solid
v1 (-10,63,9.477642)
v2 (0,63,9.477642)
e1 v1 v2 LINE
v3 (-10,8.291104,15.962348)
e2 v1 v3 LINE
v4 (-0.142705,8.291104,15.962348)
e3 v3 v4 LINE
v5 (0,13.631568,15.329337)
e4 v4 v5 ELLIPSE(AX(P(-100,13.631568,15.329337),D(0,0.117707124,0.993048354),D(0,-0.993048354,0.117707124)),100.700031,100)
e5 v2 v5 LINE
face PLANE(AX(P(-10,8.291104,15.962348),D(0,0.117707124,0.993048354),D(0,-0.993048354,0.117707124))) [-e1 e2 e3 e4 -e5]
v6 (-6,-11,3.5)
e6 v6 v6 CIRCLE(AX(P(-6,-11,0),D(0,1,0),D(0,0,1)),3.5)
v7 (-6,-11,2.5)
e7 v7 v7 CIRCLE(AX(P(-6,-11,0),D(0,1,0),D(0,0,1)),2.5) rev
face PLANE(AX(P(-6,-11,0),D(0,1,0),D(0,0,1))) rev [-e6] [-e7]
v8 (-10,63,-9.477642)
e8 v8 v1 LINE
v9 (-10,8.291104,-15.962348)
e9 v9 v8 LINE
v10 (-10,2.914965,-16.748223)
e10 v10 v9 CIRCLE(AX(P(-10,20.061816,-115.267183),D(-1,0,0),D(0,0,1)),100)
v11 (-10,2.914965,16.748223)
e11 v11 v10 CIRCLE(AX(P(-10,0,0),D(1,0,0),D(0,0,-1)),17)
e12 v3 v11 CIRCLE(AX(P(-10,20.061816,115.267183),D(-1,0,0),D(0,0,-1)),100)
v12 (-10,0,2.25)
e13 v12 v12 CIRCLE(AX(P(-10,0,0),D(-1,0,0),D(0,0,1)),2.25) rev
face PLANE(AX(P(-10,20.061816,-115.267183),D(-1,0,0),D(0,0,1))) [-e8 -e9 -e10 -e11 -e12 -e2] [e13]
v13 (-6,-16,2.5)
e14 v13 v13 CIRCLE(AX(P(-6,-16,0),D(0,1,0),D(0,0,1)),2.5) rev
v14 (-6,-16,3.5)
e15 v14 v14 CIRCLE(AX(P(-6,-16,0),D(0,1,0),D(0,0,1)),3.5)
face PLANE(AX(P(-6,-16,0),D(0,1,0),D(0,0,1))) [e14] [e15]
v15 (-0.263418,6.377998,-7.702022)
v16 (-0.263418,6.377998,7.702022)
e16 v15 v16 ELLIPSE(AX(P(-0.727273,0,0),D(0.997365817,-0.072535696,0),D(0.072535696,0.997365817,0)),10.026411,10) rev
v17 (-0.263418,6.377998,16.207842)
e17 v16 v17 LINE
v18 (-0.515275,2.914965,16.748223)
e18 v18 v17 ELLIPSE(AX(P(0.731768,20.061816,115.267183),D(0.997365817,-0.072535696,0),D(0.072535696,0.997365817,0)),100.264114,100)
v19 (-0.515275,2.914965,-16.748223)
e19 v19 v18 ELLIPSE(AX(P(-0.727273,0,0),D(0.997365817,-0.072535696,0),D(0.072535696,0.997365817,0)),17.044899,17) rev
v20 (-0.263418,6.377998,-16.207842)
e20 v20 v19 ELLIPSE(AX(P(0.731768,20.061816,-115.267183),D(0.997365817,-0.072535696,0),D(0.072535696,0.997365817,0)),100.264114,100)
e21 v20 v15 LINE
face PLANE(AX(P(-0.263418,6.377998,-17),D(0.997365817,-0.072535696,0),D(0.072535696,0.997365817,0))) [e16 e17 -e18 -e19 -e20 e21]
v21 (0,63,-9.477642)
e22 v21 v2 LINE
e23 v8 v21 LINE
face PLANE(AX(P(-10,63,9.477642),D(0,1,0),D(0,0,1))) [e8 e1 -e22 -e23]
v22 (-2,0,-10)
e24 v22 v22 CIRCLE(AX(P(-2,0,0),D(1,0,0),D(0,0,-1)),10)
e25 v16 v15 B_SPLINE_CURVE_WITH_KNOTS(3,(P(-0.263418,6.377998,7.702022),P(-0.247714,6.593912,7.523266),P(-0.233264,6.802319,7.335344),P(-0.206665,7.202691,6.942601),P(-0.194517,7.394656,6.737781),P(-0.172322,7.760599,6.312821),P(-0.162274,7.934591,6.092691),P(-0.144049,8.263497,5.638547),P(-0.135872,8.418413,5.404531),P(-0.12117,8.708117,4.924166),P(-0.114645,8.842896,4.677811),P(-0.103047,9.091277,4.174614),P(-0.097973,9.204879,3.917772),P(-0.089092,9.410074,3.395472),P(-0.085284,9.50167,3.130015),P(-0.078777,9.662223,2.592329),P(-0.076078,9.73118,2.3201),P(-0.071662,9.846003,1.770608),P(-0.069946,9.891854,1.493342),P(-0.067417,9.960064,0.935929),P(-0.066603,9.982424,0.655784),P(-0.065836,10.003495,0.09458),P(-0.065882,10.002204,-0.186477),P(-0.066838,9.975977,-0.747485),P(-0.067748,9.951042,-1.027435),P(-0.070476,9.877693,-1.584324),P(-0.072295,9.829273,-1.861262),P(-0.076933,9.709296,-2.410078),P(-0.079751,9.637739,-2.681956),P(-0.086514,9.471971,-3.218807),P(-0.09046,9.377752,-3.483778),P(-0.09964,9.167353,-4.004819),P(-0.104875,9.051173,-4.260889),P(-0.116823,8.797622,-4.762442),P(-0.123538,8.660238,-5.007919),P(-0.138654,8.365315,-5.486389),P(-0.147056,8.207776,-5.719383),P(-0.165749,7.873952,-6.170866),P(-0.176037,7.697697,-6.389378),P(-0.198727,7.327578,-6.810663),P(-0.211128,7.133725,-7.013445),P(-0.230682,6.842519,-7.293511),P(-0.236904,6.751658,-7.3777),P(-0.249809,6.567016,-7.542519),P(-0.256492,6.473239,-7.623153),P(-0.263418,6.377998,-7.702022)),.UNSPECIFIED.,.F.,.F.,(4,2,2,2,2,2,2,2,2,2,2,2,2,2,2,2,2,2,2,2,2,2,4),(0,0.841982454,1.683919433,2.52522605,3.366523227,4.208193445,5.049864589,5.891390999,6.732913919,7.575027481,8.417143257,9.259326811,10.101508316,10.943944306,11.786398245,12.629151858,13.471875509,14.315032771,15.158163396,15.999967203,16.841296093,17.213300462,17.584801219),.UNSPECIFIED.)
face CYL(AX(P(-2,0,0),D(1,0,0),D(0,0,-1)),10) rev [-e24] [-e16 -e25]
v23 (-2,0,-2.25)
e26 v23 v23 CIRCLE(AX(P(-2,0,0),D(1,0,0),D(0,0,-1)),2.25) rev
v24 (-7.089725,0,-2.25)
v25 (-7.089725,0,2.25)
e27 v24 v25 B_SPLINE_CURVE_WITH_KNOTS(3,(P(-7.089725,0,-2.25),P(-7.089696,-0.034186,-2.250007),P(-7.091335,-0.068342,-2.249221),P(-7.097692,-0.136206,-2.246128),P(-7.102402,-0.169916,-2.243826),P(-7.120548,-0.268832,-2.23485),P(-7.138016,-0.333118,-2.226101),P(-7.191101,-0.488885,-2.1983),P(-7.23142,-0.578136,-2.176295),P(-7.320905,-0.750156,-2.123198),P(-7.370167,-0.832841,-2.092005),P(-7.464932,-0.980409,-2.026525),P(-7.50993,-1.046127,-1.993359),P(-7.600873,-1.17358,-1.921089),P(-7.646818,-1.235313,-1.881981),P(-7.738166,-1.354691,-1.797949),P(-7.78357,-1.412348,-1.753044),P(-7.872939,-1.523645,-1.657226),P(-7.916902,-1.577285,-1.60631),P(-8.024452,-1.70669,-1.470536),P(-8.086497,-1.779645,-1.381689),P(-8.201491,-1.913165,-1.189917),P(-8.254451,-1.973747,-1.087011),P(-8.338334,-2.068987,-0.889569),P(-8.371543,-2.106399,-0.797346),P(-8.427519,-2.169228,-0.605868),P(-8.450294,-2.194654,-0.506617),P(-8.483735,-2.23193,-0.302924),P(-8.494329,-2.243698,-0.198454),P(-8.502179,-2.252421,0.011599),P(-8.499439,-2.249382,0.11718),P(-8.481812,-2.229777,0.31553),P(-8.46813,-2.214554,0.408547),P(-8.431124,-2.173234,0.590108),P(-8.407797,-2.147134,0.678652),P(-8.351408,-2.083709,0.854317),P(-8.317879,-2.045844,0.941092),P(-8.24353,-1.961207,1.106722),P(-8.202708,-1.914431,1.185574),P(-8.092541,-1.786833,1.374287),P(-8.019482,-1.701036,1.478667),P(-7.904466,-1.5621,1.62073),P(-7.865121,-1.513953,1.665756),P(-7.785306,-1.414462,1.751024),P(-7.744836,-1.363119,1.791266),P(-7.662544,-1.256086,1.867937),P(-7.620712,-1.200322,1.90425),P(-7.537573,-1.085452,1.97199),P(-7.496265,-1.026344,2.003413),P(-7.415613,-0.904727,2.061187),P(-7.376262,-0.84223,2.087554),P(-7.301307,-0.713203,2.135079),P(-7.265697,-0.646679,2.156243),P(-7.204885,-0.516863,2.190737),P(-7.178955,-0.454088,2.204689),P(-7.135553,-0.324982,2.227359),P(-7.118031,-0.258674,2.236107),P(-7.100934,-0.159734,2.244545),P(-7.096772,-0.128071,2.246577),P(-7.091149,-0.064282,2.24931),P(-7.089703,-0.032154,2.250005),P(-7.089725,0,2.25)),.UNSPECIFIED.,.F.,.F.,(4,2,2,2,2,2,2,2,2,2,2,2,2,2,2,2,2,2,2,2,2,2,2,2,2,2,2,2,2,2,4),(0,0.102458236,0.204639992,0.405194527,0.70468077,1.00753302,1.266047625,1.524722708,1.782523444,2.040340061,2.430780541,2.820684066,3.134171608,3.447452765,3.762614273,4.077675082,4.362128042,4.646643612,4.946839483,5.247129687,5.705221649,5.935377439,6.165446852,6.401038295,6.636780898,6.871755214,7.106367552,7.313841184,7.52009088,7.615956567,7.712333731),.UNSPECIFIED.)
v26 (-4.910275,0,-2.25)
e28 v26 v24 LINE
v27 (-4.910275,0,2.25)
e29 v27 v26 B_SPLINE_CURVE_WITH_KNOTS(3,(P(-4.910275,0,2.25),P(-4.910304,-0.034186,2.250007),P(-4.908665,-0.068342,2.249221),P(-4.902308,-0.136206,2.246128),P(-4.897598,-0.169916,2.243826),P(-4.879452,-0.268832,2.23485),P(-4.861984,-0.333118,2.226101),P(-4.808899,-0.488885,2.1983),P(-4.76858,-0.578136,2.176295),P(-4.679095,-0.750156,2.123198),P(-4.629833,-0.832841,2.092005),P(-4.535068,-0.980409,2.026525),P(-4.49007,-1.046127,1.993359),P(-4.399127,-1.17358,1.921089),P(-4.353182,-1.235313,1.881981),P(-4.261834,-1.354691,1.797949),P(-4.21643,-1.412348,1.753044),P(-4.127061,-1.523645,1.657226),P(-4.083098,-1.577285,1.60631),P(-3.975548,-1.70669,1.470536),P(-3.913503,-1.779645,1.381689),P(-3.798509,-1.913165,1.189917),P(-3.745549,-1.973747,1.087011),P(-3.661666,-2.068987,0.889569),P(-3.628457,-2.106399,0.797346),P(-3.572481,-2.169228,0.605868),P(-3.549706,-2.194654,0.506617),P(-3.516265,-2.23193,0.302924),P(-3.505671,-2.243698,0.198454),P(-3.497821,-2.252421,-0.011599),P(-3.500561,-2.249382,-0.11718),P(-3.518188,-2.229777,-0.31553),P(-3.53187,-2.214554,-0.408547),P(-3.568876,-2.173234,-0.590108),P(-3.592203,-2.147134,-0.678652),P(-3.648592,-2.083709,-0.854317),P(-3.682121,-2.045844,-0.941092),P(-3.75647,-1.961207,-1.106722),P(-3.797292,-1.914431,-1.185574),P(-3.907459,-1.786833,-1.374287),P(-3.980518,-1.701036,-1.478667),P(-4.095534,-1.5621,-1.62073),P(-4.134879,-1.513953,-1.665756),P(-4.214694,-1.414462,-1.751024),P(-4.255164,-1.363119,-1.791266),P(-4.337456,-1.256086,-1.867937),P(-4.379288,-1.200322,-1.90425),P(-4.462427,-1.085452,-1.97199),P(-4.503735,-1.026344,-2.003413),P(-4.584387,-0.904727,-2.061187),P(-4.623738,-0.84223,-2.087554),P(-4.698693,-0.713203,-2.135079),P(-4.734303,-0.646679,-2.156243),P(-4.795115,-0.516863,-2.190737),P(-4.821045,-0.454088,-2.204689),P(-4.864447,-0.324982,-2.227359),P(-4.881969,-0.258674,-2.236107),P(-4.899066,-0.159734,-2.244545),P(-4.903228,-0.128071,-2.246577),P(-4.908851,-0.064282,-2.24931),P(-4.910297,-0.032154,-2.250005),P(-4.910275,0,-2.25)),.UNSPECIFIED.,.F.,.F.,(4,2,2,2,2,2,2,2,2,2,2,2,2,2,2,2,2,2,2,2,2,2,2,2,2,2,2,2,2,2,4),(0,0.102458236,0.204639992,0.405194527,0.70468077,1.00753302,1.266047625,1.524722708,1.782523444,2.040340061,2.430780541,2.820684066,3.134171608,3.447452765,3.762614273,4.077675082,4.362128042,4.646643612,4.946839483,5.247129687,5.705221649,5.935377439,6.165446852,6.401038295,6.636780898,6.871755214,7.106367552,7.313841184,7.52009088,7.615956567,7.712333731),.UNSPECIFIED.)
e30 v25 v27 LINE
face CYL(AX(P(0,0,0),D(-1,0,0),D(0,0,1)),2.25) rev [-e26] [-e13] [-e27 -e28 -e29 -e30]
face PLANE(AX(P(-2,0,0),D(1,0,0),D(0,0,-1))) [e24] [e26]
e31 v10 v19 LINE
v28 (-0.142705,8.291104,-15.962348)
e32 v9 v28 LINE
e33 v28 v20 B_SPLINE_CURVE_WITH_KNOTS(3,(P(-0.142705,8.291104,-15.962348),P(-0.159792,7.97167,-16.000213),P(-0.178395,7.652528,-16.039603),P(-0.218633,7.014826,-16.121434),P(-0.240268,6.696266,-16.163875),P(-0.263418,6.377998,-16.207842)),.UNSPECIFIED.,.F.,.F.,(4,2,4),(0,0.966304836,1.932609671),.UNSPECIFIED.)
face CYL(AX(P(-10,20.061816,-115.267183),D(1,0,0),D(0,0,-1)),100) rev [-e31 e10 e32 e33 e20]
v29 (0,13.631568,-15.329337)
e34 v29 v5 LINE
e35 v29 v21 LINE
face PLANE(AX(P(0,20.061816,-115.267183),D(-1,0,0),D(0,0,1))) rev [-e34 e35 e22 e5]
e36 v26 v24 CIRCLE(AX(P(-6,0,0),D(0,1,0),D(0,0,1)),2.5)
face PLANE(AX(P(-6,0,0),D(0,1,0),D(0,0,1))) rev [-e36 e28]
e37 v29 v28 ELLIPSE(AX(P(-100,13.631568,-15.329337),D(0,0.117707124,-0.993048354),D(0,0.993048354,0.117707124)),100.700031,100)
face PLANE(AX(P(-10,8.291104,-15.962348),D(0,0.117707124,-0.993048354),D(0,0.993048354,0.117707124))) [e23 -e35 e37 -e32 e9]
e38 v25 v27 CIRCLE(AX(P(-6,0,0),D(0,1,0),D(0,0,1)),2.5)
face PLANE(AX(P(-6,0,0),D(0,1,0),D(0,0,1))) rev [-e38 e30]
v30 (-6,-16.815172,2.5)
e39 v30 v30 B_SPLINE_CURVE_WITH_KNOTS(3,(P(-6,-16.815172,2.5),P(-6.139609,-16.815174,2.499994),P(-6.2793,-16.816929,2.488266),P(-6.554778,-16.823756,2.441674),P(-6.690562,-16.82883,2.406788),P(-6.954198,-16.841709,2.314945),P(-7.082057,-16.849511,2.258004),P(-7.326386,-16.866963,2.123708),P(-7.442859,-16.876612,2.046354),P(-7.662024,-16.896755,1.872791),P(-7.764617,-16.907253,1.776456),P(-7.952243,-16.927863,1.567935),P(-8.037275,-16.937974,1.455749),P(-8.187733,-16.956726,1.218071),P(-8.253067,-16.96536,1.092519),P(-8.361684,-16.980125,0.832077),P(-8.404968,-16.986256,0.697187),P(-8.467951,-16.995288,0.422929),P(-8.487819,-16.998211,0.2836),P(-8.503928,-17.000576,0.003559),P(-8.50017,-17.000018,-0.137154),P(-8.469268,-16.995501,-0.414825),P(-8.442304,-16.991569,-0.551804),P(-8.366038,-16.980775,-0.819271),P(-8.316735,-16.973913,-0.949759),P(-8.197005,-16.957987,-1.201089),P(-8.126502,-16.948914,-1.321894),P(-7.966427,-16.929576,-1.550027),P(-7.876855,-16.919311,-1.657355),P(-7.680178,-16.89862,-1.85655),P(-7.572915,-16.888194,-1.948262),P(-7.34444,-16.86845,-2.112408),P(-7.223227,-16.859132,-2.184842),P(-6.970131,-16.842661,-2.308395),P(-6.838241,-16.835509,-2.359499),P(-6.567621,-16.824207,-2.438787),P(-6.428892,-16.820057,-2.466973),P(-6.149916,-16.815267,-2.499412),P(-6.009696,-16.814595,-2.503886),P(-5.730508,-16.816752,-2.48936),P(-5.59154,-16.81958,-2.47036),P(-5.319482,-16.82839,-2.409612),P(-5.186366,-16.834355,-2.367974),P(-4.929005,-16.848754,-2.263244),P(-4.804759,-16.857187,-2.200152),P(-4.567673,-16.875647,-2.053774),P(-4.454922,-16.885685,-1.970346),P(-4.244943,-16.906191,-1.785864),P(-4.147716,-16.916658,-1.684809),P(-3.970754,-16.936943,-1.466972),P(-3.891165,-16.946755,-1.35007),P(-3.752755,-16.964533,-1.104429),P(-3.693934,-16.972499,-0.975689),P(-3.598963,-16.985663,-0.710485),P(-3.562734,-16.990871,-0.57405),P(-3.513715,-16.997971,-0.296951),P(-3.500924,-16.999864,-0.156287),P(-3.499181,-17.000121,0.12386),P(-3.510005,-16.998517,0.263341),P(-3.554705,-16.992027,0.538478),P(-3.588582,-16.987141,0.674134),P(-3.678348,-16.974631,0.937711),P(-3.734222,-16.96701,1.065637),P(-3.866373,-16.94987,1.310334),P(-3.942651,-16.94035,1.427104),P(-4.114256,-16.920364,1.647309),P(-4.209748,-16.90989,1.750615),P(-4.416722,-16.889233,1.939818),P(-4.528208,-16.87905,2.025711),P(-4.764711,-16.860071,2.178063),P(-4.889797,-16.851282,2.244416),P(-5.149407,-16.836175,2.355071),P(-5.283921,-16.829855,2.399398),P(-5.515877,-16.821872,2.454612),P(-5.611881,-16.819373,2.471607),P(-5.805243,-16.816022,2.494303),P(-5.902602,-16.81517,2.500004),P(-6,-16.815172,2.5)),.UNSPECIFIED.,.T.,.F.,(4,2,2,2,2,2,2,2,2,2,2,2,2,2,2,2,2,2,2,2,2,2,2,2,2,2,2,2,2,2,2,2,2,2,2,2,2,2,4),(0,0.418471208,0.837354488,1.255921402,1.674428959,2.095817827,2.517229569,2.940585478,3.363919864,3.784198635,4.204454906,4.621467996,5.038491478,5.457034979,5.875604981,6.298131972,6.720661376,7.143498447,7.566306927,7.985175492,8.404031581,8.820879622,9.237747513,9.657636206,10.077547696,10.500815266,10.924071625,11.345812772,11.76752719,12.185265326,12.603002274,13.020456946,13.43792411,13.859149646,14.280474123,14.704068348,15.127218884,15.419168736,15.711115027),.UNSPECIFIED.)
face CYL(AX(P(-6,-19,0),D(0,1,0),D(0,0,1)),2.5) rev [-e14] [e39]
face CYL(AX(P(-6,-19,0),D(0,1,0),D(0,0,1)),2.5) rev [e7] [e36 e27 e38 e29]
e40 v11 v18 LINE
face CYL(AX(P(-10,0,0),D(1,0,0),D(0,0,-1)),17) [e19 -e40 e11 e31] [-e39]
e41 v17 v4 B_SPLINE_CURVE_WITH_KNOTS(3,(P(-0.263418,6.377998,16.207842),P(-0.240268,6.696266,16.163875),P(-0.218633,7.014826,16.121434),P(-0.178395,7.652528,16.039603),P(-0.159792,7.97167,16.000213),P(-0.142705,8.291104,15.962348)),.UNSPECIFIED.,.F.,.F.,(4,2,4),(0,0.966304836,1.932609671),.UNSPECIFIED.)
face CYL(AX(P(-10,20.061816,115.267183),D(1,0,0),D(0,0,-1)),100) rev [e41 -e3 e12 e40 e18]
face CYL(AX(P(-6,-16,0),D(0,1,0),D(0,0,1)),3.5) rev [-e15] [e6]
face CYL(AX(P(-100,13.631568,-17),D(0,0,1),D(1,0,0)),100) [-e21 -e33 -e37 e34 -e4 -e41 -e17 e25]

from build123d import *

# Parameters (mm, degrees)
SALIENTE_EXTRUIR1_DEPTH    = 10
CROQUIS3_R                 = 10
CORTAR_EXTRUIR1_DEPTH      = 2
CORTAR_EXTRUIR4_START      = -17
CORTAR_EXTRUIR4_DEPTH      = 34
CORTAR_EXTRUIR5_DEPTH      = 66.741919668
CORTAR_EXTRUIR5_DEPTH_BACK = 10
CROQUIS7_R                 = 2.25
CROQUIS8_R                 = 2.5
CORTAR_EXTRUIR6_DEPTH      = 19
CORTAR_EXTRUIR19_START     = -11
CROQUIS12_R                = 3.5
CORTAR_EXTRUIR19_DEPTH     = 5


# Read off the part's stored shape, not the designer's step: Cortar-Extruir4
with BuildPart() as part:
    # Croquis1 → Saliente-Extruir1 (new body)
    with BuildSketch(Plane(origin=(0, 0, 0), x_dir=(0, 0, -1), z_dir=(1, 0, 0))):
        with BuildLine():
            Line((-15.962347901, 8.291103532), (-9.477641645, 63))
            Line((-9.477641645, 63), (9.477641645, 63))
            Line((9.477641645, 63), (15.962347901, 8.291103532))
            ThreePointArc((15.962347901, 8.291103532), (16.318766271, 5.597695791), (16.748223211, 2.914964711))
            ThreePointArc((16.748223211, 2.914964711), (0, -17), (-16.748223211, 2.914964711))
            ThreePointArc((-16.748223211, 2.914964711), (-16.318766271, 5.597695791), (-15.962347901, 8.291103532))
        make_face()
    extrude(amount=-SALIENTE_EXTRUIR1_DEPTH)

    # Croquis3 → Cortar-Extruir1 (cut)
    with BuildSketch(Plane(origin=(0, 0, 0), x_dir=(0, 0, -1), z_dir=(1, 0, 0))):
        Circle(CROQUIS3_R)
    extrude(amount=-CORTAR_EXTRUIR1_DEPTH, mode=Mode.SUBTRACT)

    # Cortar-Extruir4 outline → Cortar-Extruir4 (cut)
    with BuildSketch(Plane.XY.offset(CORTAR_EXTRUIR4_START)):
        with BuildLine():
            ThreePointArc((0, 13.631567896), (-0.065876274, 10.002392341), (-0.263418304, 6.377998318))
            Line((-0.263418304, 6.377998318), (-1.963636364, -17))
            Line((-1.963636364, -17), (-2.109090909, -19))
            Line((-2.109090909, -19), (0, -19))
            Line((0, -19), (0, 13.631567896))
        make_face()
    extrude(amount=CORTAR_EXTRUIR4_DEPTH, mode=Mode.SUBTRACT)

    # Croquis7 → Cortar-Extruir5 (cut, two sides: drawn at the far end of the back side and taken through both)
    with BuildSketch(Plane(origin=(-2, 0, 0), x_dir=(0, 0, -1), z_dir=(1, 0, 0)).offset(-CORTAR_EXTRUIR5_DEPTH_BACK)):
        with Locations(Location((0, 0, 0), (0, 0, 180))):
            Circle(CROQUIS7_R)
    extrude(amount=CORTAR_EXTRUIR5_DEPTH + CORTAR_EXTRUIR5_DEPTH_BACK, mode=Mode.SUBTRACT)

    # Croquis8 → Cortar-Extruir6 (cut)
    with BuildSketch(Plane(origin=(0, 0, 0), x_dir=(1, 0, 0), z_dir=(0, 1, 0))):
        with Locations(Location((-6, 0, 0), (0, 0, 270))):
            Circle(CROQUIS8_R)
    extrude(amount=-CORTAR_EXTRUIR6_DEPTH, mode=Mode.SUBTRACT)

    # Croquis12 → Cortar-Extruir19 (cut)
    with BuildSketch(Plane(origin=(0, 0, 0), x_dir=(1, 0, 0), z_dir=(0, 1, 0)).offset(CORTAR_EXTRUIR19_START)):
        with Locations(Location((-6, 0, 0), (0, 0, 270))):
            Circle(CROQUIS12_R)
    extrude(amount=-CORTAR_EXTRUIR19_DEPTH, mode=Mode.SUBTRACT)


solid = part.part
